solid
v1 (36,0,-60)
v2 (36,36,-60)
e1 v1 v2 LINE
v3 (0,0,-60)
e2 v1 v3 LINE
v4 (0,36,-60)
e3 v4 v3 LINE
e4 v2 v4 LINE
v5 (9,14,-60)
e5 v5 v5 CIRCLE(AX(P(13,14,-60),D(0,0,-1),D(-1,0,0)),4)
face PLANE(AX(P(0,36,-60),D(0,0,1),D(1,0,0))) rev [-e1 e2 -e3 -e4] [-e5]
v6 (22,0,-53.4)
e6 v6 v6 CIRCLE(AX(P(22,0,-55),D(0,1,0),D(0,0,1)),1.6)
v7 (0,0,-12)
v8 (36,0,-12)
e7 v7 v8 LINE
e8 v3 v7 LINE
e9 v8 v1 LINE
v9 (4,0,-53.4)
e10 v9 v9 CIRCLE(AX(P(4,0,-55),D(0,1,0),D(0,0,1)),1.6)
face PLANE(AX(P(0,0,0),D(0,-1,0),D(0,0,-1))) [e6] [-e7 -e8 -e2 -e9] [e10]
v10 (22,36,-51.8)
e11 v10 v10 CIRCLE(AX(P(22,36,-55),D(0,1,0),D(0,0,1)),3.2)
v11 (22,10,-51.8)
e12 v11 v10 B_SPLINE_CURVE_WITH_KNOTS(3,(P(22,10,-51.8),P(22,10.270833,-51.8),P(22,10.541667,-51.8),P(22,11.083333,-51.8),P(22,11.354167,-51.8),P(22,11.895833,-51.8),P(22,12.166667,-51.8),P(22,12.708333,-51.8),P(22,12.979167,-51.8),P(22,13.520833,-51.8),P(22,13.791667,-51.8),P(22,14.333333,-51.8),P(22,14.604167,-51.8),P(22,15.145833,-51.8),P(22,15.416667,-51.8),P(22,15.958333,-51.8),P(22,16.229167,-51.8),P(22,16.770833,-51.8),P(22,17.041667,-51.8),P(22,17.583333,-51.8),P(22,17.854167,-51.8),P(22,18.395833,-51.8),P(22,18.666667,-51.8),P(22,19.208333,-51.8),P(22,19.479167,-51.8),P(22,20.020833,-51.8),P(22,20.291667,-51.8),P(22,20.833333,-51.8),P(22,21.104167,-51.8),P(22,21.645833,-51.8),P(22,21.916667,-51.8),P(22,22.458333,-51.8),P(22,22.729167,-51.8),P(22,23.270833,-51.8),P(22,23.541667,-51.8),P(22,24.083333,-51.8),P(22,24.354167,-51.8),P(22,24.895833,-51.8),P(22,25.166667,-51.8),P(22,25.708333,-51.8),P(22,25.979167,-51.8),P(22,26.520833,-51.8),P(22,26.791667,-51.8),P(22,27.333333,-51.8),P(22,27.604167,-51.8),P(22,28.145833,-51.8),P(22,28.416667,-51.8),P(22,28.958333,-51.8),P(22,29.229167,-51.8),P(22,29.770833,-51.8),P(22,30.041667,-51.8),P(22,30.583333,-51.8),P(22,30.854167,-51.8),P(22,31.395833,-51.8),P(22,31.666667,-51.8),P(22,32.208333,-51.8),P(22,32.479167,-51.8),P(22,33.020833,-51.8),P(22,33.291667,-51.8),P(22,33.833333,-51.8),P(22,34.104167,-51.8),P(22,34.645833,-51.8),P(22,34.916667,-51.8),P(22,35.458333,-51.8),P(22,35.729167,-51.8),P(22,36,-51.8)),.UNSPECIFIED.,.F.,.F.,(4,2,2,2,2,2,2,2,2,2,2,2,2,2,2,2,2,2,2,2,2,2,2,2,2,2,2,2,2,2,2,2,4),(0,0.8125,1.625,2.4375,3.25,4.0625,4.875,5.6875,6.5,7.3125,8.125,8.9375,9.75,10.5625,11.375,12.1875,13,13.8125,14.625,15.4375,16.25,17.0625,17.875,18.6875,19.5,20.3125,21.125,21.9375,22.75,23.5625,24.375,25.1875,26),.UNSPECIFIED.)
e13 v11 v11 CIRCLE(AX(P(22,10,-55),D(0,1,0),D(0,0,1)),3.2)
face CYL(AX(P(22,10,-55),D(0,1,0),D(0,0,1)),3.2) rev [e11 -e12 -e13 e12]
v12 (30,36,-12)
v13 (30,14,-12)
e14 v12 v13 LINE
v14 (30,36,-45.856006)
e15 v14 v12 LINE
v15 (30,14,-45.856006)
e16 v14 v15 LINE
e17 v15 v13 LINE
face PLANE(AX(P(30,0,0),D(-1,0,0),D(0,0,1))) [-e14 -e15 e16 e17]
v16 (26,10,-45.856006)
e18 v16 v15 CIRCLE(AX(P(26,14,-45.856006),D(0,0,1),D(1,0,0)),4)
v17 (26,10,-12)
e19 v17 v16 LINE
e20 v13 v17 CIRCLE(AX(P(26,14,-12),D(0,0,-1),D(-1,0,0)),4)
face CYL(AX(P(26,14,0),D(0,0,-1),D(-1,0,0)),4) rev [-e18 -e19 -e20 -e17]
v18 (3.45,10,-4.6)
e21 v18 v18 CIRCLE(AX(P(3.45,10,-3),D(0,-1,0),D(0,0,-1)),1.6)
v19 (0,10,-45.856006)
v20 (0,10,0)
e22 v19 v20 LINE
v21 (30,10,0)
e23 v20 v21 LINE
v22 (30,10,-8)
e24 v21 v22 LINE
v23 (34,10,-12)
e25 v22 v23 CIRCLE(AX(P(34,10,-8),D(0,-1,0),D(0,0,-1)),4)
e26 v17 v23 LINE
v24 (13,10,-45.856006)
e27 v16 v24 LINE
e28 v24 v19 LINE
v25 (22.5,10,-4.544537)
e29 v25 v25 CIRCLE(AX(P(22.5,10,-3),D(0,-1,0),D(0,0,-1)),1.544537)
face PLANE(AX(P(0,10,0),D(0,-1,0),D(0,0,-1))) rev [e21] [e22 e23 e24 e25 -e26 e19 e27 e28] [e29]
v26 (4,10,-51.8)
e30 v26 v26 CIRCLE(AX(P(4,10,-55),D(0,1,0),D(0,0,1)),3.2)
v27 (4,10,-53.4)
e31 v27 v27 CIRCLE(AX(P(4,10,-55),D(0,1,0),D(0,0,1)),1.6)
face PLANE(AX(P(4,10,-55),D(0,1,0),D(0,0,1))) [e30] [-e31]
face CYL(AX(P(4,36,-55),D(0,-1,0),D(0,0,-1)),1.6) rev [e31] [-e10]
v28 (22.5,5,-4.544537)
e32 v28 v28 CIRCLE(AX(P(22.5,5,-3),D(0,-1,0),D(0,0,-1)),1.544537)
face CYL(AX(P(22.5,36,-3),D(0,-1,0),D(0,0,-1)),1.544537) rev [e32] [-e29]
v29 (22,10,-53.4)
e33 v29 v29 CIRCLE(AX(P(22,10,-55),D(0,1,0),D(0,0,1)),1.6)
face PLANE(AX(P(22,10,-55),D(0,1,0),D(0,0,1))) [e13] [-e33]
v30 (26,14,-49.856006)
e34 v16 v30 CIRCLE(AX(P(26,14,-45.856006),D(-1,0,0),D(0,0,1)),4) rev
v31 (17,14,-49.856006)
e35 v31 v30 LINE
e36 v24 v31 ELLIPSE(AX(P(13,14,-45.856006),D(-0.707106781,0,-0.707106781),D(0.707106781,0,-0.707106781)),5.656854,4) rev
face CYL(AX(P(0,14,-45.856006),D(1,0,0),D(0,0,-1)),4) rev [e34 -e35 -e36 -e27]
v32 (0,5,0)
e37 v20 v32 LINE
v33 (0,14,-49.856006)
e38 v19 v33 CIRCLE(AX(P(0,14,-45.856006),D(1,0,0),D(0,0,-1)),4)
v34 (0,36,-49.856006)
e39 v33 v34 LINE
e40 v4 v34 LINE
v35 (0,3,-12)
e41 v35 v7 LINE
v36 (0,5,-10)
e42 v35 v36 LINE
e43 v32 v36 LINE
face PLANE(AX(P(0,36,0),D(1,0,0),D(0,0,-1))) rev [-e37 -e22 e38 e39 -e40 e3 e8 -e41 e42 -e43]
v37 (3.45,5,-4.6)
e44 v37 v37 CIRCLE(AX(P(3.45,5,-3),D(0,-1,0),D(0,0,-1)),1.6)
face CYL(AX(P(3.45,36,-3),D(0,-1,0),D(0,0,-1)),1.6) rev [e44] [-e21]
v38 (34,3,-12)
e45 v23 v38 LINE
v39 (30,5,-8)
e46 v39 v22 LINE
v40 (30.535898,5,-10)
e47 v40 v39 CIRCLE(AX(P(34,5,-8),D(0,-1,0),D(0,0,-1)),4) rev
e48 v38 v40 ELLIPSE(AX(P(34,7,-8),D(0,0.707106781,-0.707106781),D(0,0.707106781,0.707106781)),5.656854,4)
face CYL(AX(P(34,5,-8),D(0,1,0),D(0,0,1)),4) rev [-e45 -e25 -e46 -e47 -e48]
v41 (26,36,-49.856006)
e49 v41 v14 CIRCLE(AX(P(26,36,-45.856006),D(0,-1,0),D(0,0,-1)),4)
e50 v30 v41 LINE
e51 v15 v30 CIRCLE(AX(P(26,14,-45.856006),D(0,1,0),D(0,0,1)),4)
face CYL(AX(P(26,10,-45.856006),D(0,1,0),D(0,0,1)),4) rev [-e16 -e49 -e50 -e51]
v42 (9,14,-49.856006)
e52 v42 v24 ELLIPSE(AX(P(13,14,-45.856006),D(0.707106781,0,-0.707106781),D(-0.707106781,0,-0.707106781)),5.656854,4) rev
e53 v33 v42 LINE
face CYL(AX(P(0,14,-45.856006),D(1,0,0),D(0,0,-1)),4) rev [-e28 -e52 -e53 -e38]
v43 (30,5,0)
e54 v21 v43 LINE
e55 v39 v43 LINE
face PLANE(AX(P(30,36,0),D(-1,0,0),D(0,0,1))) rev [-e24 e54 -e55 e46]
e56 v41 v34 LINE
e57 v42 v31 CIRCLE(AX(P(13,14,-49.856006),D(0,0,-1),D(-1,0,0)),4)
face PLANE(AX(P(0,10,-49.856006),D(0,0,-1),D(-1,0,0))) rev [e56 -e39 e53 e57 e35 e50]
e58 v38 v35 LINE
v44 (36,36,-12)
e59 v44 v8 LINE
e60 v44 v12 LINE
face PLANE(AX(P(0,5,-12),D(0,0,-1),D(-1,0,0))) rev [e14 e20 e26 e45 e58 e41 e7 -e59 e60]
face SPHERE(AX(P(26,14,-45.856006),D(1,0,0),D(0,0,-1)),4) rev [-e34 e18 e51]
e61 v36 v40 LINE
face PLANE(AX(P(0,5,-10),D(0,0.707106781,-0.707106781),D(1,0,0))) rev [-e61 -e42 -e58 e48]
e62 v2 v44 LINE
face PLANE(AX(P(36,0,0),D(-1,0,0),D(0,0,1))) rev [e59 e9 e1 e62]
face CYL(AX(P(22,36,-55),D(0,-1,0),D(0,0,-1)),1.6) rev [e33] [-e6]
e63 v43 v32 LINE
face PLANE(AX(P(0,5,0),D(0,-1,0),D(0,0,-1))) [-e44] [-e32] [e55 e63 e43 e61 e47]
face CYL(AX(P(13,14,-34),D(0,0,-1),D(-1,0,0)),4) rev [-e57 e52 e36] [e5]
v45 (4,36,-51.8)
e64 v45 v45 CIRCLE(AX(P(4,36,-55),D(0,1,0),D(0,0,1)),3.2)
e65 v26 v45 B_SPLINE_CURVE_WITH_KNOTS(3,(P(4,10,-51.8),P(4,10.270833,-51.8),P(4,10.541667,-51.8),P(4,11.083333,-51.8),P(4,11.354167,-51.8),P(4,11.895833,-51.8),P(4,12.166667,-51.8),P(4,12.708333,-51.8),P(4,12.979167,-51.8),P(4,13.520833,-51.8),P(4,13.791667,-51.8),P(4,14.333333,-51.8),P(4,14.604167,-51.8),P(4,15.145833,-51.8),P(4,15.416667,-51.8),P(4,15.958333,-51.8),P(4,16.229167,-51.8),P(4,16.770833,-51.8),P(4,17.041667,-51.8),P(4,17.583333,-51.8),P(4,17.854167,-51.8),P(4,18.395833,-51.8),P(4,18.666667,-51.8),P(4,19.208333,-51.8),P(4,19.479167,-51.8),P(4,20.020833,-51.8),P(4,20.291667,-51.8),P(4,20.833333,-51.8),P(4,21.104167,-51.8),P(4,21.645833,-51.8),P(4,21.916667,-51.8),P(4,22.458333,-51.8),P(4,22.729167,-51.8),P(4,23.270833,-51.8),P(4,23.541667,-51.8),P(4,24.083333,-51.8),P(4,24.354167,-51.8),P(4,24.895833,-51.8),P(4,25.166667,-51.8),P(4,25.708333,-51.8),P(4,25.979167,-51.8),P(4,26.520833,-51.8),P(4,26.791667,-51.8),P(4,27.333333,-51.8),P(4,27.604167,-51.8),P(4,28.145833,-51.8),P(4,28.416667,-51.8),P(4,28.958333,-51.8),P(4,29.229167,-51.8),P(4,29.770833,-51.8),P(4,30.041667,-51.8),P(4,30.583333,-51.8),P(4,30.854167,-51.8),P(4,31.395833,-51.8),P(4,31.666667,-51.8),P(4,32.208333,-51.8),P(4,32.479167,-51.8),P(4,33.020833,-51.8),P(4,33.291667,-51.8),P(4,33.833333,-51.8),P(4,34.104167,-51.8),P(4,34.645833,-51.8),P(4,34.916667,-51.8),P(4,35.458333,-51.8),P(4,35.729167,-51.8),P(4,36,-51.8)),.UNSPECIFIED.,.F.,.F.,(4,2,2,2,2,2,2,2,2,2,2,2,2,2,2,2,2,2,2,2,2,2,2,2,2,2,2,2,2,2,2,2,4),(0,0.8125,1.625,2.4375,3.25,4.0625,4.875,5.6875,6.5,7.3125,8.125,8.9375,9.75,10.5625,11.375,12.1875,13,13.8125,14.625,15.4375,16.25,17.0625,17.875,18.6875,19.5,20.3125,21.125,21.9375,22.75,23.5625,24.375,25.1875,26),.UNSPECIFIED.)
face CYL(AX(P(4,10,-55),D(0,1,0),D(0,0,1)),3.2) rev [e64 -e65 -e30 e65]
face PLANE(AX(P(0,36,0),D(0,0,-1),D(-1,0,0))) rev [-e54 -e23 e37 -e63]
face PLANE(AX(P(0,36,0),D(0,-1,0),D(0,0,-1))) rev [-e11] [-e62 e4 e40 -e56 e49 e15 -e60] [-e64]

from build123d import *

# Parameters (mm, degrees)
SKETCH2_W           = 30
SKETCH2_H           = 60
SKETCH2_R           = 1.6
SKETCH2_R_2         = 1.544536525
BOSS_EXTRUDE1_DEPTH = 36
SKETCH3_W           = 30
SKETCH3_H           = 49.856005965
CUT_EXTRUDE1_DEPTH  = 26
SKETCH4_W           = 30
SKETCH4_H           = 12
CUT_EXTRUDE2_DEPTH  = 5
SKETCH5_R           = 3.2
CUT_EXTRUDE3_DEPTH  = 26
SKETCH6_R           = 4
CUT_EXTRUDE4_DEPTH  = 26
SKETCH8_W           = 48
SKETCH8_H           = 36
BOSS_EXTRUDE3_DEPTH = 6
CHAMFER1_SIZE       = 2
FILLET1_R           = 4
FILLET2_R           = 4


with BuildPart() as part:
    # Sketch2 → Boss-Extrude1 (new body)
    with BuildSketch(Plane(origin=(0, 0, 0), x_dir=(1, 0, 0), z_dir=(0, 1, 0))):
        with Locations((15, 30)):
            Rectangle(SKETCH2_W, SKETCH2_H)
        with Locations(Location((3.45, 3, 0), (0, 0, 270))):
            Circle(SKETCH2_R, mode=Mode.SUBTRACT)
        with Locations(Location((22.5, 3, 0), (0, 0, 270))):
            Circle(SKETCH2_R_2, mode=Mode.SUBTRACT)
        with Locations(Location((4, 55, 0), (0, 0, 270))):
            Circle(SKETCH2_R, mode=Mode.SUBTRACT)
        with Locations(Location((22, 55, 0), (0, 0, 270))):
            Circle(SKETCH2_R, mode=Mode.SUBTRACT)
    extrude(amount=BOSS_EXTRUDE1_DEPTH)

    # Sketch3 → Cut-Extrude1 (cut)
    with BuildSketch(Plane(origin=(0, 36, 0), x_dir=(1, 0, 0), z_dir=(0, 1, 0))):
        with Locations((15, 24.928002983)):
            Rectangle(SKETCH3_W, SKETCH3_H)
    extrude(amount=-CUT_EXTRUDE1_DEPTH, mode=Mode.SUBTRACT)

    # Sketch4 → Cut-Extrude2 (cut)
    with BuildSketch(Plane.XZ):
        with Locations((15, -6)):
            Rectangle(SKETCH4_W, SKETCH4_H)
    extrude(amount=-CUT_EXTRUDE2_DEPTH, mode=Mode.SUBTRACT)

    # Sketch5 → Cut-Extrude3 (cut)
    with BuildSketch(Plane(origin=(0, 36, 0), x_dir=(1, 0, 0), z_dir=(0, 1, 0))):
        with Locations(Location((4, 55, 0), (0, 0, 270))):
            Circle(SKETCH5_R)
        with Locations(Location((22, 55, 0), (0, 0, 270))):
            Circle(SKETCH5_R)
    extrude(amount=-CUT_EXTRUDE3_DEPTH, mode=Mode.SUBTRACT)

    # Sketch6 → Cut-Extrude4 (cut)
    with BuildSketch(Plane(origin=(0, 0, -60), x_dir=(-1, 0, 0), z_dir=(0, 0, -1))):
        with Locations((-13, 14)):
            Circle(SKETCH6_R)
    extrude(amount=-CUT_EXTRUDE4_DEPTH, mode=Mode.SUBTRACT)

    # Sketch8 → Boss-Extrude3 (add)
    with BuildSketch(Plane(origin=(30, 0, 0), x_dir=(0, 0, -1), z_dir=(1, 0, 0))):
        with Locations((36, 18)):
            Rectangle(SKETCH8_W, SKETCH8_H)
    extrude(amount=BOSS_EXTRUDE3_DEPTH)

    # Chamfer1
    chamfer1_edges = [part.edges().sort_by_distance(p)[0] for p in [
        (15, 5, -12),
    ]]
    chamfer(chamfer1_edges, length=CHAMFER1_SIZE)

    # Fillet1
    # the kernel refuses this fillet: 4 mm, written as the material it adds along each edge
    with BuildSketch(Plane(origin=(30, 10, -12), x_dir=(0, 0, 1), z_dir=(0, -1, 0))) as fillet1_piece_1_section:
        with BuildLine():
            CenterArc((FILLET1_R, -FILLET1_R), FILLET1_R, 90, 90)
            Line((0, -FILLET1_R), (0, 0))
            Line((0, 0), (FILLET1_R, 0))
        make_face()
    fillet1_piece_1 = extrude(amount=17, mode=Mode.PRIVATE)
    fillet1_piece_1 = split(fillet1_piece_1, bisect_by=Plane(origin=(30.901414649, 5.69775692, -9.30224308), z_dir=(0, 0.7071067811865476, -0.7071067811865476)), keep=Keep.TOP, mode=Mode.PRIVATE)
    add(fillet1_piece_1)
    with BuildSketch(Plane(origin=(30, 20, -12), x_dir=(0, 0, 1), z_dir=(0, -1, 0))) as fillet1_piece_2_section:
        with BuildLine():
            CenterArc((FILLET1_R, -FILLET1_R), FILLET1_R, 90, 90)
            Line((0, -FILLET1_R), (0, 0))
            Line((0, 0), (FILLET1_R, 0))
        make_face()
    fillet1_piece_2 = extrude(amount=27, mode=Mode.PRIVATE)
    fillet1_piece_2 = split(fillet1_piece_2, bisect_by=Plane(origin=(30.104627362, 5, -9.206224594), z_dir=(0, 1, 0)), keep=Keep.TOP, mode=Mode.PRIVATE)
    fillet1_piece_2 = split(fillet1_piece_2, bisect_by=Plane(origin=(30.104627362, 5.595331555, -9.404668445), z_dir=(0, -0.7071067811865476, 0.7071067811865476)), keep=Keep.TOP, mode=Mode.PRIVATE)
    add(fillet1_piece_2)

    # Fillet2
    # the kernel refuses this fillet: 4 mm, written as the material it adds along each edge
    with BuildSketch(Plane(origin=(26, 14, -45.856005965), x_dir=(0, 0, -1), z_dir=(0, -1, 0))) as fillet2_piece_1_section:
        Polygon((0, 0), (FILLET2_R * 1.02, 0), (FILLET2_R * 1.02, FILLET2_R * 1.02), (0, FILLET2_R * 1.02), align=None)
    fillet2_piece_1 = extrude(amount=FILLET2_R * 1.02, mode=Mode.PRIVATE)
    fillet2_piece_1 = fillet2_piece_1 - Plane(origin=(26, 14, -45.856005965), x_dir=(-0.7071067811865475, 0, 0.7071067811865475), z_dir=(0, -1, 0)) * Sphere(FILLET2_R, mode=Mode.PRIVATE)
    add(fillet2_piece_1)
    with BuildSketch(Plane(origin=(26, 10, -49.856005965), x_dir=(0, 1, 0), z_dir=(-1, 0, 0))) as fillet2_piece_2_section:
        with BuildLine():
            CenterArc((FILLET2_R, -FILLET2_R), FILLET2_R, 90, 90)
            Line((0, -FILLET2_R), (0, 0))
            Line((0, 0), (FILLET2_R, 0))
        make_face()
    fillet2_piece_2 = extrude(amount=13, mode=Mode.PRIVATE)
    fillet2_piece_2 = fillet2_piece_2 - Plane(origin=(13, 14, -48.921311945), x_dir=(-1, 0, 0), z_dir=(0, 0, -1)) * Cylinder(4, 42, mode=Mode.PRIVATE)
    add(fillet2_piece_2)
    with BuildSketch(Plane(origin=(30, 36, -49.856005965), x_dir=(-1, 0, 0), z_dir=(0, -1, 0))) as fillet2_piece_3:
        with BuildLine():
            CenterArc((FILLET2_R, -FILLET2_R), FILLET2_R, 90, 90)
            Line((0, -FILLET2_R), (0, 0))
            Line((0, 0), (FILLET2_R, 0))
        make_face()
    extrude(amount=22)
    with BuildSketch(Plane(origin=(13, 10, -49.856005965), x_dir=(0, 1, 0), z_dir=(-1, 0, 0))) as fillet2_piece_4_section:
        with BuildLine():
            CenterArc((FILLET2_R, -FILLET2_R), FILLET2_R, 90, 90)
            Line((0, -FILLET2_R), (0, 0))
            Line((0, 0), (FILLET2_R, 0))
        make_face()
    fillet2_piece_4 = extrude(amount=13, mode=Mode.PRIVATE)
    fillet2_piece_4 = fillet2_piece_4 - Plane(origin=(13, 14, -48.921311944), x_dir=(-1, 0, 0), z_dir=(0, 0, -1)) * Cylinder(4, 43, mode=Mode.PRIVATE)
    add(fillet2_piece_4)
    with BuildSketch(Plane(origin=(30, 10, -12), x_dir=(0, 1, 0), z_dir=(0, 0, -1))) as fillet2_piece_5:
        with BuildLine():
            CenterArc((FILLET2_R, -FILLET2_R), FILLET2_R, 90, 90)
            Line((0, -FILLET2_R), (0, 0))
            Line((0, 0), (FILLET2_R, 0))
        make_face()
    extrude(amount=33.856005965)


solid = part.part
